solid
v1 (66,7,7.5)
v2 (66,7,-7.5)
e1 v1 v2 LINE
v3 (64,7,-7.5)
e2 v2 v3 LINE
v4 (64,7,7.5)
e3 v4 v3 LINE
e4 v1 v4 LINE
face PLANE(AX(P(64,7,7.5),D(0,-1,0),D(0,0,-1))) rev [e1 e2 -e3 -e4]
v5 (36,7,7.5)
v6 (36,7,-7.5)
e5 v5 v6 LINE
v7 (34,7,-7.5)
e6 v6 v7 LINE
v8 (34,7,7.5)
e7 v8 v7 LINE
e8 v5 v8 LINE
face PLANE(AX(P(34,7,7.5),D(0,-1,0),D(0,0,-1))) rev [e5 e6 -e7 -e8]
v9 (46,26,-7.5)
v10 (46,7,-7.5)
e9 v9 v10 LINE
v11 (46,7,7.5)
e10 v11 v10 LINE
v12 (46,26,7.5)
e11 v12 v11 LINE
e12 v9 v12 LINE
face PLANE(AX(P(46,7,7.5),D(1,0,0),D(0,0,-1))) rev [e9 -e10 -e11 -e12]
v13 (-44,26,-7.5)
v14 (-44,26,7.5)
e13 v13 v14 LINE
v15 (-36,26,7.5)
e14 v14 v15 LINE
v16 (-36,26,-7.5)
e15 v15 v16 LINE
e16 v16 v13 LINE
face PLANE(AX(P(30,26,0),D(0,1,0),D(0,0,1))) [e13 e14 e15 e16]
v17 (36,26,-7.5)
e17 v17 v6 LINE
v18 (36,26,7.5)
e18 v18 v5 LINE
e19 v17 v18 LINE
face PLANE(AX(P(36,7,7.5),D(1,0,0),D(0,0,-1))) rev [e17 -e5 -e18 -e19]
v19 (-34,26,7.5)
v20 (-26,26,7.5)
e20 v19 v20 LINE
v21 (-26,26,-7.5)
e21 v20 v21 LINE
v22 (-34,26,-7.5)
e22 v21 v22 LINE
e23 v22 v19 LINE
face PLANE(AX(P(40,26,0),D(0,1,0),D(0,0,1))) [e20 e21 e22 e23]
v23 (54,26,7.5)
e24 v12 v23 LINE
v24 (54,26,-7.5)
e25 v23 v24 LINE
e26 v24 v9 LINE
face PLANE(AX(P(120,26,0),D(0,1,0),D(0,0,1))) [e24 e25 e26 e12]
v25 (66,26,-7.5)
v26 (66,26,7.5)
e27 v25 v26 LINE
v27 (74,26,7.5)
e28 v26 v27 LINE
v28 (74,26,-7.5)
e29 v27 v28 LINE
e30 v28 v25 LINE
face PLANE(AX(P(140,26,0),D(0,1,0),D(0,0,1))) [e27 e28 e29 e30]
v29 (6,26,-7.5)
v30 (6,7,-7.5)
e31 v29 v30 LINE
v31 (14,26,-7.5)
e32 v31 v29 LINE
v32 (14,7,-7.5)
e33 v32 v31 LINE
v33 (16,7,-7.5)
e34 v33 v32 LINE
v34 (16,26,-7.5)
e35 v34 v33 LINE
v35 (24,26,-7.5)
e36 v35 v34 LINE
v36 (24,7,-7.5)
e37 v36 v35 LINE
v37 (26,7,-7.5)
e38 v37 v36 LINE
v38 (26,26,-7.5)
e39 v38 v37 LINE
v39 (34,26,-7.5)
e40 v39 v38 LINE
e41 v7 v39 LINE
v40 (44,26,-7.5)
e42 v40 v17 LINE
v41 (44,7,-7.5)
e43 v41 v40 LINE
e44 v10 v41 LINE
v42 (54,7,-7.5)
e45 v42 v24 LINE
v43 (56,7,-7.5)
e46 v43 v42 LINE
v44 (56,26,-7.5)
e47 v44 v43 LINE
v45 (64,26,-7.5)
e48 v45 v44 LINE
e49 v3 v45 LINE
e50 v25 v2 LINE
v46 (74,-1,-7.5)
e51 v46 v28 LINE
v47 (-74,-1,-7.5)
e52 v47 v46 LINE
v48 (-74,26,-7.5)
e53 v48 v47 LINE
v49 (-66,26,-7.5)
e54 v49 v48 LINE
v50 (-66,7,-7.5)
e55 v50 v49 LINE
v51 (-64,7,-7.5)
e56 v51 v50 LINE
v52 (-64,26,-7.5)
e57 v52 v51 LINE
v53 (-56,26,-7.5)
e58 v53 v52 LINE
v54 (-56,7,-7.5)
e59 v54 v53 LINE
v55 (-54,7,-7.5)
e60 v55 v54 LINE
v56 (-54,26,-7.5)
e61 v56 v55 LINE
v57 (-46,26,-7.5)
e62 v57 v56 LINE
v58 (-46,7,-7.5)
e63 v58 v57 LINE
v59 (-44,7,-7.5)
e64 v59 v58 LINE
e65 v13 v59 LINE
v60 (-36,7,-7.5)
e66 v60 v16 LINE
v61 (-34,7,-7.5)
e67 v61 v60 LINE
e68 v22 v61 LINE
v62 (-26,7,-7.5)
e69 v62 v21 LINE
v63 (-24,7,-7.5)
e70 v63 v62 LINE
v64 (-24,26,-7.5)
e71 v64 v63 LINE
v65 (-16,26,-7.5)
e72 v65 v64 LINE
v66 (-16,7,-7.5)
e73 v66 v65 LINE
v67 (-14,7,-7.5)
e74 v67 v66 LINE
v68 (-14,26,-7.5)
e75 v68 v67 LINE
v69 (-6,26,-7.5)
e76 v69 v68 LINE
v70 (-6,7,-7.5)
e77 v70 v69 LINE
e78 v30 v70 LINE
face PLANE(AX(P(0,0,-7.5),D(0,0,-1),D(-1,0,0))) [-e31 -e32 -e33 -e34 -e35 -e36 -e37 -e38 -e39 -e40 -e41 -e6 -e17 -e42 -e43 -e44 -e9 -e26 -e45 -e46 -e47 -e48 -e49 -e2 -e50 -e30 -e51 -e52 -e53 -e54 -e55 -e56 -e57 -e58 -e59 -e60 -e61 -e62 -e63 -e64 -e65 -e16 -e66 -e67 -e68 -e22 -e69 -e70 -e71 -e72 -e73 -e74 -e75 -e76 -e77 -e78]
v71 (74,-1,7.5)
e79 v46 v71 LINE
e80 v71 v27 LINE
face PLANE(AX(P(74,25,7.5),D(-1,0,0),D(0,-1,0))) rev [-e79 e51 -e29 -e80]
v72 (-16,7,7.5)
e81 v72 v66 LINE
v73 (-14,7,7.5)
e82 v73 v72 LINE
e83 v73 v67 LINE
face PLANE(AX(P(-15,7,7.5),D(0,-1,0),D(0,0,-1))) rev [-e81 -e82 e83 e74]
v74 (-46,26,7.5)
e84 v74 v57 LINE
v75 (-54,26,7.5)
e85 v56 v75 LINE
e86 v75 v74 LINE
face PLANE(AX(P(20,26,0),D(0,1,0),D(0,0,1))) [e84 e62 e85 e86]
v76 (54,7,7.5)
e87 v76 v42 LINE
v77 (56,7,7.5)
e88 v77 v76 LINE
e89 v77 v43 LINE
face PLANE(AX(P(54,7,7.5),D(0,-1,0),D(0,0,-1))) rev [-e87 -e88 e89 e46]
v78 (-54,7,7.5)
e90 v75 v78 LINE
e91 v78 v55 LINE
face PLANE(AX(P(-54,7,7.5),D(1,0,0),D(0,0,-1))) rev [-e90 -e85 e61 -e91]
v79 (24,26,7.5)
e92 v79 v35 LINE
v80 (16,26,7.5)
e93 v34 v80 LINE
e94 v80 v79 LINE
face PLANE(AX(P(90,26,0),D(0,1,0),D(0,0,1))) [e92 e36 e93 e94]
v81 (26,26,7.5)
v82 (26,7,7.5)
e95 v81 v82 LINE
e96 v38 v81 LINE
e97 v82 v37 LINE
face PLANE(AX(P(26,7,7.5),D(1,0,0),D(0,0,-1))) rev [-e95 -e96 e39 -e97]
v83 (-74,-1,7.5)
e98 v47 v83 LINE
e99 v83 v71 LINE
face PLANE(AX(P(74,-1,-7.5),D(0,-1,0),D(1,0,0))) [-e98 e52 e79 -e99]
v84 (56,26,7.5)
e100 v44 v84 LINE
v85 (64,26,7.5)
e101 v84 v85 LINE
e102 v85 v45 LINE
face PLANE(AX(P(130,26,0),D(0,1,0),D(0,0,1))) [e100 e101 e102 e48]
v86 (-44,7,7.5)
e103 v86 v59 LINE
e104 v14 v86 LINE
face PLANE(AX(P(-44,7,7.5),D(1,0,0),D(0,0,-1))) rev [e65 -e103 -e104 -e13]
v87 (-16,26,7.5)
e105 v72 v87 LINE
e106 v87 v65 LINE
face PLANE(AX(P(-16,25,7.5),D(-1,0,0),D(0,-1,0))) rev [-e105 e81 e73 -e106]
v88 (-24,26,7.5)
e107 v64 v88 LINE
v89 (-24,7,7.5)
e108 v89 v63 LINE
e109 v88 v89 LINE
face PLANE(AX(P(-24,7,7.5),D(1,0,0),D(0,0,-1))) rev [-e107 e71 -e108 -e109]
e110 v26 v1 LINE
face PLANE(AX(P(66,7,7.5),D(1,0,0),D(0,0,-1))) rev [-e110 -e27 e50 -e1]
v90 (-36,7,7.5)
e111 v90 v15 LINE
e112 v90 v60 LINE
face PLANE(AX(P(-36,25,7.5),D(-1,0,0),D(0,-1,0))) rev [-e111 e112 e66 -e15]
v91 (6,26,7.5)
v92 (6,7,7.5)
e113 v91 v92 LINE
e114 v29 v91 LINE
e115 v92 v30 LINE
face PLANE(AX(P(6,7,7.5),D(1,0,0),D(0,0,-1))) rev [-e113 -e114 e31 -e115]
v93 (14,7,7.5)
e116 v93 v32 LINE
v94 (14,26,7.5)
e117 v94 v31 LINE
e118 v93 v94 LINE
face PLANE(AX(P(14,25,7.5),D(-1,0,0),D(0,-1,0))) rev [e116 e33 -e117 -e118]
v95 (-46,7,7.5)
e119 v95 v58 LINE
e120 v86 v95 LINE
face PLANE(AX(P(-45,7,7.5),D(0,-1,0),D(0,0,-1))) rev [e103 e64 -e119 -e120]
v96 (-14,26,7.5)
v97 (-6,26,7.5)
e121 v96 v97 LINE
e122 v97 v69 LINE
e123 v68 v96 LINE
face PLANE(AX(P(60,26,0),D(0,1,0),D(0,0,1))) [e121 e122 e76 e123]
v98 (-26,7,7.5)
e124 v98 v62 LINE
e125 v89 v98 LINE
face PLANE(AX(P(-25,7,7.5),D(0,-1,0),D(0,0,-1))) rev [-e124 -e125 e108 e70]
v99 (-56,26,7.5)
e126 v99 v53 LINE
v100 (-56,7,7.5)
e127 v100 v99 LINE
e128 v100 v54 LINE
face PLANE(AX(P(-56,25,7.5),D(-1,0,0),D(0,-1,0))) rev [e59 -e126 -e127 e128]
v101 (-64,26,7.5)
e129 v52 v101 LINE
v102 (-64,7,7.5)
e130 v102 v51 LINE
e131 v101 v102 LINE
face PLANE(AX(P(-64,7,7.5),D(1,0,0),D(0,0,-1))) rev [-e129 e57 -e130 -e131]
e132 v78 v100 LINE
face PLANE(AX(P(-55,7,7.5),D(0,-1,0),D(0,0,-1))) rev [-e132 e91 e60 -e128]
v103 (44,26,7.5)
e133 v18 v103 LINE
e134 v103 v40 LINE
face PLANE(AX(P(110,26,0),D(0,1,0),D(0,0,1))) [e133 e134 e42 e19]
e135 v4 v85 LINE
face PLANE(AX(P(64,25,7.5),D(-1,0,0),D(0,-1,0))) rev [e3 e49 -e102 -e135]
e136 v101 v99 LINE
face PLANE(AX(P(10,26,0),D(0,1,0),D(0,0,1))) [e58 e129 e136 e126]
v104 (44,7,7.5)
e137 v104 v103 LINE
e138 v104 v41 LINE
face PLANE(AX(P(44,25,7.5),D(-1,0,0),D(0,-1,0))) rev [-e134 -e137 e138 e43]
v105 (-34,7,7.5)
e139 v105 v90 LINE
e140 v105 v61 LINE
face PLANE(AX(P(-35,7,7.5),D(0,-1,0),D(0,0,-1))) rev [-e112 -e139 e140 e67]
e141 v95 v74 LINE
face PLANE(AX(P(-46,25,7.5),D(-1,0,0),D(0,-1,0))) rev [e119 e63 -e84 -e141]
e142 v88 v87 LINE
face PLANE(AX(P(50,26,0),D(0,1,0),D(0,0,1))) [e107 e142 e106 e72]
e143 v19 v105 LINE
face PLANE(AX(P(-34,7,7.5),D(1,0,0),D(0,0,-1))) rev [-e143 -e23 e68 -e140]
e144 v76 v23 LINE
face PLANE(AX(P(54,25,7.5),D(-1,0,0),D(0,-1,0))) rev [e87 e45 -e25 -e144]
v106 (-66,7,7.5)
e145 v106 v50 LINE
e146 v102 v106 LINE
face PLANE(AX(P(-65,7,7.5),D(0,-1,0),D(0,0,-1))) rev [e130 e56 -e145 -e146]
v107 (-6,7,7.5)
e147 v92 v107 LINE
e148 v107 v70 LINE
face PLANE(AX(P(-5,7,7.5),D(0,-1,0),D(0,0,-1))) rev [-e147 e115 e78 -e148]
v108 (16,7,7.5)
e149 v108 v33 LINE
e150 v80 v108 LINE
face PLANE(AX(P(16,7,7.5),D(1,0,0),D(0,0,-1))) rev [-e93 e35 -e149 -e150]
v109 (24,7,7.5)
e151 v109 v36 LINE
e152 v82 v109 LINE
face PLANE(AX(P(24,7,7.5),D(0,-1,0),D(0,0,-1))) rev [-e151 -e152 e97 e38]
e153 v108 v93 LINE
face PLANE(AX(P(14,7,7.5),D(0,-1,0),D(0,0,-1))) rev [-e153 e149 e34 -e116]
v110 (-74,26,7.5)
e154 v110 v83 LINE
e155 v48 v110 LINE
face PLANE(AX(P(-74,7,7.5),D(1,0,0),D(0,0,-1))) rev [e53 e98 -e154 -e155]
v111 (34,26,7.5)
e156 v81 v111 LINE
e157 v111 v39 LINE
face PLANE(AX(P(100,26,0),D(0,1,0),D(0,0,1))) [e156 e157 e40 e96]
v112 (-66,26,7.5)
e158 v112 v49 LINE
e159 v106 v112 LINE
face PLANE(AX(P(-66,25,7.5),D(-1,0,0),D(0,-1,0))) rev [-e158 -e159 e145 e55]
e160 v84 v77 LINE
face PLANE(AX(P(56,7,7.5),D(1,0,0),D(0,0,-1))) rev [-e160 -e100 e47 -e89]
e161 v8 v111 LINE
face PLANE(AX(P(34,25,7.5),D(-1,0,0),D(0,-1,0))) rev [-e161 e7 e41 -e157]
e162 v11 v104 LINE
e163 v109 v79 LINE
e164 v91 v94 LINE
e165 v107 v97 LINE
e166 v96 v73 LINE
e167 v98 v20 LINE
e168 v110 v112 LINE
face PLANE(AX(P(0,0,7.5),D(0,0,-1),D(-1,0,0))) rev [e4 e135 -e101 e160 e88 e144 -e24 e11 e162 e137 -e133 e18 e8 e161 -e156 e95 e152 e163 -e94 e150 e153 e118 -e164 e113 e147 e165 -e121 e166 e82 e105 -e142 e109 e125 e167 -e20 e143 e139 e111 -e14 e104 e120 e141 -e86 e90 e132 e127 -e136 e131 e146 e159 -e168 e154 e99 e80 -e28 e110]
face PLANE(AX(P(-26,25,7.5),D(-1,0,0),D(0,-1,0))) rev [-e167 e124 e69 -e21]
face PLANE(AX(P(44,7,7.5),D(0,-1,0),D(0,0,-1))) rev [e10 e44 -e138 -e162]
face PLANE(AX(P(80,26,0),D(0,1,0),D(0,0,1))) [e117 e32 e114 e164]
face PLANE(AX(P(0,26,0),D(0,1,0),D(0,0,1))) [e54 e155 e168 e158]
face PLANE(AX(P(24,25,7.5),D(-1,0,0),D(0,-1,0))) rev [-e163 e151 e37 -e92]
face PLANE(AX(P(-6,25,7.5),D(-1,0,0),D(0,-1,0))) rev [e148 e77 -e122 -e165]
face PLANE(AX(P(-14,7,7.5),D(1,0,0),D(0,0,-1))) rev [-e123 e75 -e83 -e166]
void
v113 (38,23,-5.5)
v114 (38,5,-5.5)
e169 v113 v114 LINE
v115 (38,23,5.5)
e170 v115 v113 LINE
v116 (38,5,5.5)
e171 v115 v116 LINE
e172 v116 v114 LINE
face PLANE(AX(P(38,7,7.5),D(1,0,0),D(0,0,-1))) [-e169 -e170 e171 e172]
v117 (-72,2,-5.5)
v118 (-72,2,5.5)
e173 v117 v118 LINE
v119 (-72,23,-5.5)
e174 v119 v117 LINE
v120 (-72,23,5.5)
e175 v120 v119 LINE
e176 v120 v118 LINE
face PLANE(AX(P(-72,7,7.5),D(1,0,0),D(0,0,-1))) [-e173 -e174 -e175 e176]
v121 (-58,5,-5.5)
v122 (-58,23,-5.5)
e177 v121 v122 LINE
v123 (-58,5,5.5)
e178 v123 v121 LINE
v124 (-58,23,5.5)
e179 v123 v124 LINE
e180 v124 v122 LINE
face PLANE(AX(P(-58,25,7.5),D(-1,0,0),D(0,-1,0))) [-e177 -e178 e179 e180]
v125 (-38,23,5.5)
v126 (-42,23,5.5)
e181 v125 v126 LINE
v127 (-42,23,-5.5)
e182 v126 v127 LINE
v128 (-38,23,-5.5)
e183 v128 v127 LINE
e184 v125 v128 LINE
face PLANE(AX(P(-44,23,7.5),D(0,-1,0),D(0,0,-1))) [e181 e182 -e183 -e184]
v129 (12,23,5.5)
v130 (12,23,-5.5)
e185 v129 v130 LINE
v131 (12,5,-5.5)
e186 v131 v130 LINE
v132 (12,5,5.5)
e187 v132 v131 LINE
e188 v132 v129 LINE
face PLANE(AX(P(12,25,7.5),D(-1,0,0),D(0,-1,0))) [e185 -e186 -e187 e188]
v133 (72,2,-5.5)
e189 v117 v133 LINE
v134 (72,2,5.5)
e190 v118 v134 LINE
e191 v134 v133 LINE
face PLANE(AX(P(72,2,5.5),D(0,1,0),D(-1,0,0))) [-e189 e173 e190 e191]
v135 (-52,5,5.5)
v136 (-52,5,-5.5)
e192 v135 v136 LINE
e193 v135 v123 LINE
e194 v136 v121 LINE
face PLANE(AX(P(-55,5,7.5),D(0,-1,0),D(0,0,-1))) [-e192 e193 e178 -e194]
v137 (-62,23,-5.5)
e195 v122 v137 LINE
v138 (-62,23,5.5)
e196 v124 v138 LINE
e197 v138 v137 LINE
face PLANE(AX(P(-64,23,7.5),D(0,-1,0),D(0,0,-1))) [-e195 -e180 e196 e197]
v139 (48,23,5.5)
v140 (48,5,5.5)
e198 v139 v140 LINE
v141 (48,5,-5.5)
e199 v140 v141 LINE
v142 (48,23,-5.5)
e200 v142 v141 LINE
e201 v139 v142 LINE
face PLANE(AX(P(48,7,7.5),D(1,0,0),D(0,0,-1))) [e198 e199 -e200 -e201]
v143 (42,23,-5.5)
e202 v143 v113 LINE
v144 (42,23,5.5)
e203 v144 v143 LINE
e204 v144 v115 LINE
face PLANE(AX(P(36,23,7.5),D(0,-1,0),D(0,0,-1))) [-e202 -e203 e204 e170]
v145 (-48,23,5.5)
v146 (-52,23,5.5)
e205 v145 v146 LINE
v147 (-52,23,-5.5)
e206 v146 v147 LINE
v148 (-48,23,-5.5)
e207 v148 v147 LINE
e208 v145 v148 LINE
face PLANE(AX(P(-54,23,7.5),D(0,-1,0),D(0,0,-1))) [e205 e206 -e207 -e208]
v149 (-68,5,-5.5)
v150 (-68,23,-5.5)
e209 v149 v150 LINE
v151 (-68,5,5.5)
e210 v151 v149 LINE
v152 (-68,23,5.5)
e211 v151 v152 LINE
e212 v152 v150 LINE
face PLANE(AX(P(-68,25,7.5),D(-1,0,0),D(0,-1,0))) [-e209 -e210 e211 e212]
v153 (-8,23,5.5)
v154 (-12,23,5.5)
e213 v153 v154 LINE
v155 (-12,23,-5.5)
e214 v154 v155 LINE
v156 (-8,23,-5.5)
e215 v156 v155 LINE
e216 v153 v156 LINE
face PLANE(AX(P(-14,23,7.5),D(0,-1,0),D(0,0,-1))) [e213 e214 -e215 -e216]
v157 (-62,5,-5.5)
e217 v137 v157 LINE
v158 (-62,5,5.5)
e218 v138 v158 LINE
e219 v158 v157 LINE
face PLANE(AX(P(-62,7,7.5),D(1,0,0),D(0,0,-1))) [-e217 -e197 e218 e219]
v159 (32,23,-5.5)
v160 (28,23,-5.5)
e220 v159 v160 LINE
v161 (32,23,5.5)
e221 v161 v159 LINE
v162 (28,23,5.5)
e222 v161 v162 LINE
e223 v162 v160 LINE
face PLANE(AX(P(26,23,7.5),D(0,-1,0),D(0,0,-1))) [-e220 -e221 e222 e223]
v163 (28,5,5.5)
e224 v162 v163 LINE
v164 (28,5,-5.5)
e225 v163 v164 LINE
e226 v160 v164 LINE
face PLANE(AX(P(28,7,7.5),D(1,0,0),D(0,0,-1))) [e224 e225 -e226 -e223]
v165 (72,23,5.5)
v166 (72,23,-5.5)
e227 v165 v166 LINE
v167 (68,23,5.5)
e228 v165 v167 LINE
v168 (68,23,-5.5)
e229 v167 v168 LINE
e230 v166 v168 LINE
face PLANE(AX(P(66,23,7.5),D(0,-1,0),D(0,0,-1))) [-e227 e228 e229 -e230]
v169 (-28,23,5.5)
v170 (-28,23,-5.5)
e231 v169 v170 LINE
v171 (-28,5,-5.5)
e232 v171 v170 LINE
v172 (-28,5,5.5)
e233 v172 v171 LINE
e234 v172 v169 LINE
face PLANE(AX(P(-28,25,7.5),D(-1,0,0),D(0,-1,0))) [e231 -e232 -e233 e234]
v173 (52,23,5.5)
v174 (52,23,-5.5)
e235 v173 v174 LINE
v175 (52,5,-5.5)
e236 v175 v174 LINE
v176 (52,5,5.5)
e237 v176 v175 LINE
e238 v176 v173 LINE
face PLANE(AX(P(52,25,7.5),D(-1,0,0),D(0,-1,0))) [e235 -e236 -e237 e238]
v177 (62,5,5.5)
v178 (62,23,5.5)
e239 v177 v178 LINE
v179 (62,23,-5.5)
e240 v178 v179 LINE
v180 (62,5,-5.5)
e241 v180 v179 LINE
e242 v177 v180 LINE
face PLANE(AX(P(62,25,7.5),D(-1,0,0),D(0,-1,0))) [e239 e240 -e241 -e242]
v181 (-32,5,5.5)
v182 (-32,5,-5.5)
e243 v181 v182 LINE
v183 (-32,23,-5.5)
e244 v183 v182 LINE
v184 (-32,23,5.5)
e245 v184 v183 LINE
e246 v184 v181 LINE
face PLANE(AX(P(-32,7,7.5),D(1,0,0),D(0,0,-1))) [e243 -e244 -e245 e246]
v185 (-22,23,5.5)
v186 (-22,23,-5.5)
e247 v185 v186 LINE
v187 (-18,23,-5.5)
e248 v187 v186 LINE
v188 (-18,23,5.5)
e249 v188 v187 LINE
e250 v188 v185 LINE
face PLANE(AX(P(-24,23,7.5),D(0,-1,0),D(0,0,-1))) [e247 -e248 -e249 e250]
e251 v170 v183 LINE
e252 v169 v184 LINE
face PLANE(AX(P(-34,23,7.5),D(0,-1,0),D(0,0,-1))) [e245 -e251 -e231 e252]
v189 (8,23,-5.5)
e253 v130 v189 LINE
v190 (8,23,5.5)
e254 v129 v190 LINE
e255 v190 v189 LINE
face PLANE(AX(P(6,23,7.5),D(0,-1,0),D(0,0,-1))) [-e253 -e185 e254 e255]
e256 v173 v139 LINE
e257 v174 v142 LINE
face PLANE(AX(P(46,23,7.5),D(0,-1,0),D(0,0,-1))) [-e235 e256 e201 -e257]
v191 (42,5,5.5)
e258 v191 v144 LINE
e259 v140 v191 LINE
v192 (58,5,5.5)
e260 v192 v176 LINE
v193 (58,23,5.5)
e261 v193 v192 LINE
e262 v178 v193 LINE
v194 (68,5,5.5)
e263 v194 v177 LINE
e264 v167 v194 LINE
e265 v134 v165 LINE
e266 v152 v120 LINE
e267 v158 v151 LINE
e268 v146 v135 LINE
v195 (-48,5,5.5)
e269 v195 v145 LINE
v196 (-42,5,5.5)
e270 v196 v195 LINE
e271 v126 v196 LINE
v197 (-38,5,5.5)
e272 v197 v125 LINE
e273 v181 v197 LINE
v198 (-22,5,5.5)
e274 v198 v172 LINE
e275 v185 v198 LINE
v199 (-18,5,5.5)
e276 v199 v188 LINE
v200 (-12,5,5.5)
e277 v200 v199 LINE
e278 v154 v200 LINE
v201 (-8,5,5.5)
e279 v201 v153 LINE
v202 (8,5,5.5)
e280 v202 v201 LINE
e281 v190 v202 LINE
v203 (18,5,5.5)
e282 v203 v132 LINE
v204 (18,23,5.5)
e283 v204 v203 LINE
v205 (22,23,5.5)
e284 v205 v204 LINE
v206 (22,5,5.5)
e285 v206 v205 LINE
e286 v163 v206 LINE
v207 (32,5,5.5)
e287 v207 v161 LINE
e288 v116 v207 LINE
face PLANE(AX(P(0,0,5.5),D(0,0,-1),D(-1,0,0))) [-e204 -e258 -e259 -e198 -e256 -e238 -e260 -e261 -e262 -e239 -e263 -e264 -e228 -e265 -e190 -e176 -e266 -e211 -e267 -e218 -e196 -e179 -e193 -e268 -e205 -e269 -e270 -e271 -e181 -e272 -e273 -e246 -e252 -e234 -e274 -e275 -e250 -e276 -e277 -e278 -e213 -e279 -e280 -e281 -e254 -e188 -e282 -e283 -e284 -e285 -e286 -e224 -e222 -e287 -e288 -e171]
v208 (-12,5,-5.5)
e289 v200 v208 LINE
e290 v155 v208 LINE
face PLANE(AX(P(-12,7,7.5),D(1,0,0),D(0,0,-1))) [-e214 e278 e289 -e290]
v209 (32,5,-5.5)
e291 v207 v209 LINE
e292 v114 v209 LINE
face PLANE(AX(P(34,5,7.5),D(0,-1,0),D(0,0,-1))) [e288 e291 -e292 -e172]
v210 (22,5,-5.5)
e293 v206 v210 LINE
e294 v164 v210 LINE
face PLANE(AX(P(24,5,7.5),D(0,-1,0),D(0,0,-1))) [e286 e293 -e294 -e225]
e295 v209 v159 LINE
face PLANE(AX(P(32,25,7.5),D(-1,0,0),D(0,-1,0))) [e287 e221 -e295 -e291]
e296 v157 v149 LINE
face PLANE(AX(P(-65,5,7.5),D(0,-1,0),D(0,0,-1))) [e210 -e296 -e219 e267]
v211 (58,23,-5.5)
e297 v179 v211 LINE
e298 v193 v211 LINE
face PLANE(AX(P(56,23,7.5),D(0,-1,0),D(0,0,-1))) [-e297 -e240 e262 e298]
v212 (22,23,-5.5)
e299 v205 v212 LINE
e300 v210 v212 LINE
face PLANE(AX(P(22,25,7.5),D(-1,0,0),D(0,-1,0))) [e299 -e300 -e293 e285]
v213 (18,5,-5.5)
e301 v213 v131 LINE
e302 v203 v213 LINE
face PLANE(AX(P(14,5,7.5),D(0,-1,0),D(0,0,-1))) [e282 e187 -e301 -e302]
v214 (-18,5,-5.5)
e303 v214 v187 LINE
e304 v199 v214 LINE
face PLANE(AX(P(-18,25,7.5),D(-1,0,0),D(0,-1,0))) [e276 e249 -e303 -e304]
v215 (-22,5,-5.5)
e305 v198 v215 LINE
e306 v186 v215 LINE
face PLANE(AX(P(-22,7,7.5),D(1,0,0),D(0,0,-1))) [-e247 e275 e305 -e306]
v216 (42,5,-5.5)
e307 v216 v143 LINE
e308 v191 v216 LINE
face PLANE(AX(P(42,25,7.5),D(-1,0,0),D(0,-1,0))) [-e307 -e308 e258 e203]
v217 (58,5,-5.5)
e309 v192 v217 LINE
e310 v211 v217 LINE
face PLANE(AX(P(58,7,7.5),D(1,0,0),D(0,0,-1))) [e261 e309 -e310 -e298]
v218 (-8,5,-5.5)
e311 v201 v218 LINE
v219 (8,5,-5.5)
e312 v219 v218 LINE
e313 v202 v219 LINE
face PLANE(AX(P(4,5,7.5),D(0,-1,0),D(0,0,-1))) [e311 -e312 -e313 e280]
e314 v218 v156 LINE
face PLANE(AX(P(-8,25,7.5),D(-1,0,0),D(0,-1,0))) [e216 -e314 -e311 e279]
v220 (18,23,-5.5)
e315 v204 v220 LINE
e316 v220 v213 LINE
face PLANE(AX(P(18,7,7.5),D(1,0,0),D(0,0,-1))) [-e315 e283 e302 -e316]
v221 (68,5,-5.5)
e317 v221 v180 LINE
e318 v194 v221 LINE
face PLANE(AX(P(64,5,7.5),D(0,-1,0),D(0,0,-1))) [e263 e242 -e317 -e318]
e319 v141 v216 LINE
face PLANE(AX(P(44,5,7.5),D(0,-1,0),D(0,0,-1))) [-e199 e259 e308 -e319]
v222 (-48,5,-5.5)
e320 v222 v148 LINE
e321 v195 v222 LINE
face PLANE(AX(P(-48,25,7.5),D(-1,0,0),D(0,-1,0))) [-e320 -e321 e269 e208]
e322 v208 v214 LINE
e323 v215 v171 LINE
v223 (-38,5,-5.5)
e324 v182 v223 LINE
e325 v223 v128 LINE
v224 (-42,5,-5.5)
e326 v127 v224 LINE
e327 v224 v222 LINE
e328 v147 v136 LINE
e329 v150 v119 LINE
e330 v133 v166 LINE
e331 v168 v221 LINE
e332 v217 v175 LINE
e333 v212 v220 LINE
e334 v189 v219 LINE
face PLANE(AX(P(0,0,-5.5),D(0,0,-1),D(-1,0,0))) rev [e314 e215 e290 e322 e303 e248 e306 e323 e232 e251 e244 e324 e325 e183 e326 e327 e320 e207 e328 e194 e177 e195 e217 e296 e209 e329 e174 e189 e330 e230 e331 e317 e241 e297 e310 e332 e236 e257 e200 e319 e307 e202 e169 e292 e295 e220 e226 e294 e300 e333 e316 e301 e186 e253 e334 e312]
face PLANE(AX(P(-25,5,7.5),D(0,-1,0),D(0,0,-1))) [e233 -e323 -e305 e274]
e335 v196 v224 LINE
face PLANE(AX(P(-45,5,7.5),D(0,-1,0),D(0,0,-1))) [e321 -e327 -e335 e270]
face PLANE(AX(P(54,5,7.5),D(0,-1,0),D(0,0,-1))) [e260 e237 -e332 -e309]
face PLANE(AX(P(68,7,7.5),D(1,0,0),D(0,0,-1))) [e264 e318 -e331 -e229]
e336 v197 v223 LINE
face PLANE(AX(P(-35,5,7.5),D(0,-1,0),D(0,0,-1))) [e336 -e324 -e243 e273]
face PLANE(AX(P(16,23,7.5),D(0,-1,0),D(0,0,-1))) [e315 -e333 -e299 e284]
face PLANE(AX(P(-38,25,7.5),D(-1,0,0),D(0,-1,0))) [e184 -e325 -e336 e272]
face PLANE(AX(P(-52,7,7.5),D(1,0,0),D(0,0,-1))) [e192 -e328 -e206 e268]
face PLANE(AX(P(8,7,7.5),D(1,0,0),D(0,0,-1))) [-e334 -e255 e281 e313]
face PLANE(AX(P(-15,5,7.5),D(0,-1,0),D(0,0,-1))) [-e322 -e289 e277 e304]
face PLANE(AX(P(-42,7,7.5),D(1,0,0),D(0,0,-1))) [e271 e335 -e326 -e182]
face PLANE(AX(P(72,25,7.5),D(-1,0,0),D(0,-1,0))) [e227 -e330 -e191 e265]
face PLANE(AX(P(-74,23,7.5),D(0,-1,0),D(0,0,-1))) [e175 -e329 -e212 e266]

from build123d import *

# Parameters (mm, degrees)
BOSS_EXTRUDE1_DEPTH     = 7.5
LPATTERN1_COUNT         = 8
LPATTERN1_PITCH         = 10
LPATTERN1_COL_COUNT     = 8
LPATTERN1_COL_PITCH     = 10
SHELL2_T                = -2
CUT_EXTRUDE2_DEPTH      = 15
CUT_EXTRUDE2_DEPTH_BACK = 80.411900871
SKETCH3_W               = 1
SKETCH3_H               = 7
SKETCH4_W               = 11
SKETCH4_H               = 3
BOSS_EXTRUDE2_DEPTH     = 2
SKETCH5_W               = 11
SKETCH5_H               = 4
BOSS_EXTRUDE3_DEPTH     = 2
SKETCH6_W               = 148
SKETCH6_H               = 1
BOSS_EXTRUDE4_DEPTH     = 7.5
SKETCH8_W               = 8
SKETCH8_H               = 15
BOSS_EXTRUDE5_DEPTH     = 1
LPATTERN2_COUNT         = 15
LPATTERN2_PITCH         = 10
SKETCH10_W              = 8
SKETCH10_H              = 15
CUT_EXTRUDE4_DEPTH      = 21
SKETCH11_W              = 15
SKETCH11_H              = 2
BOSS_EXTRUDE6_DEPTH     = 8


# Read off the part's stored shape, not the designer's step: Split1
with BuildPart() as part:
    # Sketch1 → Boss-Extrude1 (new, symmetric)
    with BuildSketch(Plane.XY):
        Polygon((0, 0), (-5, 0), (-5, 7), (-4, 7), (-4, 25), (4, 25), (4, 7), (5, 7), (5, 0), align=None)
    boss_extrude1 = extrude(amount=BOSS_EXTRUDE1_DEPTH, both=True)

    # LPattern1: Boss-Extrude1 ×8
    with Locations(*[(-i * LPATTERN1_PITCH, 0, 0) for i in range(1, LPATTERN1_COUNT)]):
        add(boss_extrude1)


with BuildPart() as lpattern1_col_1:
    # LPattern1 col: pattern copy
    add(boss_extrude1.moved(Location(Vector(1, 0, 0) * (1 * LPATTERN1_COL_PITCH))))


with BuildPart() as lpattern1_col_2:
    # LPattern1 col: pattern copy
    add(boss_extrude1.moved(Location(Vector(1, 0, 0) * (2 * LPATTERN1_COL_PITCH))))


with BuildPart() as lpattern1_col_3:
    # LPattern1 col: pattern copy
    add(boss_extrude1.moved(Location(Vector(1, 0, 0) * (3 * LPATTERN1_COL_PITCH))))


with BuildPart() as lpattern1_col_4:
    # LPattern1 col: pattern copy
    add(boss_extrude1.moved(Location(Vector(1, 0, 0) * (4 * LPATTERN1_COL_PITCH))))


with BuildPart() as lpattern1_col_5:
    # LPattern1 col: pattern copy
    add(boss_extrude1.moved(Location(Vector(1, 0, 0) * (5 * LPATTERN1_COL_PITCH))))


with BuildPart() as lpattern1_col_6:
    # LPattern1 col: pattern copy
    add(boss_extrude1.moved(Location(Vector(1, 0, 0) * (6 * LPATTERN1_COL_PITCH))))


with BuildPart() as lpattern1_col_7:
    # LPattern1 col: pattern copy
    add(boss_extrude1.moved(Location(Vector(1, 0, 0) * (7 * LPATTERN1_COL_PITCH))))


with BuildPart() as part_1:
    add(part.part)

    # LPattern1 col united with what the copie: union LPattern1 col_1, LPattern1 col_2, LPattern1 col_3, LPattern1 col_4, LPattern1 col_5, LPattern1 col_6, LPattern1 col_7
    add(lpattern1_col_1.part)
    add(lpattern1_col_2.part)
    add(lpattern1_col_3.part)
    add(lpattern1_col_4.part)
    add(lpattern1_col_5.part)
    add(lpattern1_col_6.part)
    add(lpattern1_col_7.part)

    # Shell2
    shell2_openings = [part_1.faces().sort_by_distance(p)[0] for p in [
        (75, 3.5, 0),
        (-75, 3.5, 0),
    ]]
    offset(amount=SHELL2_T, openings=shell2_openings, kind=Kind.INTERSECTION)

    # Sketch3 → Cut-Extrude2 (cut, two sides: drawn at the far end of the back side and taken through both)
    with BuildSketch(Plane.XY.offset(-CUT_EXTRUDE2_DEPTH_BACK)):
        with Locations((-74.5, 3.5)):
            Rectangle(SKETCH3_W, SKETCH3_H)
        with Locations((74.5, 3.5)):
            Rectangle(SKETCH3_W, SKETCH3_H)
    extrude(amount=CUT_EXTRUDE2_DEPTH + CUT_EXTRUDE2_DEPTH_BACK, mode=Mode.SUBTRACT)

    # Sketch4 → Boss-Extrude2 (add)
    with BuildSketch(Plane.ZY.offset(74)):
        with Locations((0, 3.5)):
            Rectangle(SKETCH4_W, SKETCH4_H)
    extrude(amount=-BOSS_EXTRUDE2_DEPTH)

    # Sketch5 → Boss-Extrude3 (add)
    with BuildSketch(Plane(origin=(74, 0, 0), x_dir=(0, 0, -1), z_dir=(1, 0, 0))):
        with Locations((0, 3)):
            Rectangle(SKETCH5_W, SKETCH5_H)
    extrude(amount=-BOSS_EXTRUDE3_DEPTH)

    # Sketch6 → Boss-Extrude4 (add, symmetric)
    with BuildSketch(Plane.XY):
        with Locations((0, -0.5)):
            Rectangle(SKETCH6_W, SKETCH6_H)
    extrude(amount=BOSS_EXTRUDE4_DEPTH, both=True)

    # Sketch8 → Boss-Extrude5 (add)
    with BuildSketch(Plane(origin=(0, 25, 0), x_dir=(1, 0, 0), z_dir=(0, 1, 0))):
        with Locations((-70, 0)):
            Rectangle(SKETCH8_W, SKETCH8_H)
    boss_extrude5 = extrude(amount=BOSS_EXTRUDE5_DEPTH)

    # LPattern2: Boss-Extrude5 ×15
    with Locations(*[(i * LPATTERN2_PITCH, 0, 0) for i in range(1, LPATTERN2_COUNT)]):
        add(boss_extrude5)


with BuildPart() as body_2:
    # Split1: the piece on the far side of the plane
    add(part_1.part)
    split(bisect_by=Plane(origin=(0, 2, 0), x_dir=(1, 0, 0), z_dir=(0, 1, 0)), keep=Keep.BOTTOM)


with BuildPart() as part_2:
    add(part_1.part)

    # Split1
    split(bisect_by=Plane(origin=(0, 2, 0), x_dir=(1, 0, 0), z_dir=(0, 1, 0)), keep=Keep.TOP)

    # Sketch10 → Cut-Extrude4 (cut)
    with BuildSketch(Plane(origin=(0, 26, 0), x_dir=(1, 0, 0), z_dir=(0, 1, 0))):
        Rectangle(SKETCH10_W, SKETCH10_H)
    extrude(amount=-CUT_EXTRUDE4_DEPTH, mode=Mode.SUBTRACT)

    # Sketch11 → Boss-Extrude6 (add)
    with BuildSketch(Plane(origin=(-4, 0, 0), x_dir=(0, 0, -1), z_dir=(1, 0, 0))):
        with Locations((0, 6)):
            Rectangle(SKETCH11_W, SKETCH11_H)
    extrude(amount=BOSS_EXTRUDE6_DEPTH)


with BuildPart() as body_2_1:
    add(body_2.part)

    # Combine1: union part
    add(part_2.part)


solid = body_2_1.part
